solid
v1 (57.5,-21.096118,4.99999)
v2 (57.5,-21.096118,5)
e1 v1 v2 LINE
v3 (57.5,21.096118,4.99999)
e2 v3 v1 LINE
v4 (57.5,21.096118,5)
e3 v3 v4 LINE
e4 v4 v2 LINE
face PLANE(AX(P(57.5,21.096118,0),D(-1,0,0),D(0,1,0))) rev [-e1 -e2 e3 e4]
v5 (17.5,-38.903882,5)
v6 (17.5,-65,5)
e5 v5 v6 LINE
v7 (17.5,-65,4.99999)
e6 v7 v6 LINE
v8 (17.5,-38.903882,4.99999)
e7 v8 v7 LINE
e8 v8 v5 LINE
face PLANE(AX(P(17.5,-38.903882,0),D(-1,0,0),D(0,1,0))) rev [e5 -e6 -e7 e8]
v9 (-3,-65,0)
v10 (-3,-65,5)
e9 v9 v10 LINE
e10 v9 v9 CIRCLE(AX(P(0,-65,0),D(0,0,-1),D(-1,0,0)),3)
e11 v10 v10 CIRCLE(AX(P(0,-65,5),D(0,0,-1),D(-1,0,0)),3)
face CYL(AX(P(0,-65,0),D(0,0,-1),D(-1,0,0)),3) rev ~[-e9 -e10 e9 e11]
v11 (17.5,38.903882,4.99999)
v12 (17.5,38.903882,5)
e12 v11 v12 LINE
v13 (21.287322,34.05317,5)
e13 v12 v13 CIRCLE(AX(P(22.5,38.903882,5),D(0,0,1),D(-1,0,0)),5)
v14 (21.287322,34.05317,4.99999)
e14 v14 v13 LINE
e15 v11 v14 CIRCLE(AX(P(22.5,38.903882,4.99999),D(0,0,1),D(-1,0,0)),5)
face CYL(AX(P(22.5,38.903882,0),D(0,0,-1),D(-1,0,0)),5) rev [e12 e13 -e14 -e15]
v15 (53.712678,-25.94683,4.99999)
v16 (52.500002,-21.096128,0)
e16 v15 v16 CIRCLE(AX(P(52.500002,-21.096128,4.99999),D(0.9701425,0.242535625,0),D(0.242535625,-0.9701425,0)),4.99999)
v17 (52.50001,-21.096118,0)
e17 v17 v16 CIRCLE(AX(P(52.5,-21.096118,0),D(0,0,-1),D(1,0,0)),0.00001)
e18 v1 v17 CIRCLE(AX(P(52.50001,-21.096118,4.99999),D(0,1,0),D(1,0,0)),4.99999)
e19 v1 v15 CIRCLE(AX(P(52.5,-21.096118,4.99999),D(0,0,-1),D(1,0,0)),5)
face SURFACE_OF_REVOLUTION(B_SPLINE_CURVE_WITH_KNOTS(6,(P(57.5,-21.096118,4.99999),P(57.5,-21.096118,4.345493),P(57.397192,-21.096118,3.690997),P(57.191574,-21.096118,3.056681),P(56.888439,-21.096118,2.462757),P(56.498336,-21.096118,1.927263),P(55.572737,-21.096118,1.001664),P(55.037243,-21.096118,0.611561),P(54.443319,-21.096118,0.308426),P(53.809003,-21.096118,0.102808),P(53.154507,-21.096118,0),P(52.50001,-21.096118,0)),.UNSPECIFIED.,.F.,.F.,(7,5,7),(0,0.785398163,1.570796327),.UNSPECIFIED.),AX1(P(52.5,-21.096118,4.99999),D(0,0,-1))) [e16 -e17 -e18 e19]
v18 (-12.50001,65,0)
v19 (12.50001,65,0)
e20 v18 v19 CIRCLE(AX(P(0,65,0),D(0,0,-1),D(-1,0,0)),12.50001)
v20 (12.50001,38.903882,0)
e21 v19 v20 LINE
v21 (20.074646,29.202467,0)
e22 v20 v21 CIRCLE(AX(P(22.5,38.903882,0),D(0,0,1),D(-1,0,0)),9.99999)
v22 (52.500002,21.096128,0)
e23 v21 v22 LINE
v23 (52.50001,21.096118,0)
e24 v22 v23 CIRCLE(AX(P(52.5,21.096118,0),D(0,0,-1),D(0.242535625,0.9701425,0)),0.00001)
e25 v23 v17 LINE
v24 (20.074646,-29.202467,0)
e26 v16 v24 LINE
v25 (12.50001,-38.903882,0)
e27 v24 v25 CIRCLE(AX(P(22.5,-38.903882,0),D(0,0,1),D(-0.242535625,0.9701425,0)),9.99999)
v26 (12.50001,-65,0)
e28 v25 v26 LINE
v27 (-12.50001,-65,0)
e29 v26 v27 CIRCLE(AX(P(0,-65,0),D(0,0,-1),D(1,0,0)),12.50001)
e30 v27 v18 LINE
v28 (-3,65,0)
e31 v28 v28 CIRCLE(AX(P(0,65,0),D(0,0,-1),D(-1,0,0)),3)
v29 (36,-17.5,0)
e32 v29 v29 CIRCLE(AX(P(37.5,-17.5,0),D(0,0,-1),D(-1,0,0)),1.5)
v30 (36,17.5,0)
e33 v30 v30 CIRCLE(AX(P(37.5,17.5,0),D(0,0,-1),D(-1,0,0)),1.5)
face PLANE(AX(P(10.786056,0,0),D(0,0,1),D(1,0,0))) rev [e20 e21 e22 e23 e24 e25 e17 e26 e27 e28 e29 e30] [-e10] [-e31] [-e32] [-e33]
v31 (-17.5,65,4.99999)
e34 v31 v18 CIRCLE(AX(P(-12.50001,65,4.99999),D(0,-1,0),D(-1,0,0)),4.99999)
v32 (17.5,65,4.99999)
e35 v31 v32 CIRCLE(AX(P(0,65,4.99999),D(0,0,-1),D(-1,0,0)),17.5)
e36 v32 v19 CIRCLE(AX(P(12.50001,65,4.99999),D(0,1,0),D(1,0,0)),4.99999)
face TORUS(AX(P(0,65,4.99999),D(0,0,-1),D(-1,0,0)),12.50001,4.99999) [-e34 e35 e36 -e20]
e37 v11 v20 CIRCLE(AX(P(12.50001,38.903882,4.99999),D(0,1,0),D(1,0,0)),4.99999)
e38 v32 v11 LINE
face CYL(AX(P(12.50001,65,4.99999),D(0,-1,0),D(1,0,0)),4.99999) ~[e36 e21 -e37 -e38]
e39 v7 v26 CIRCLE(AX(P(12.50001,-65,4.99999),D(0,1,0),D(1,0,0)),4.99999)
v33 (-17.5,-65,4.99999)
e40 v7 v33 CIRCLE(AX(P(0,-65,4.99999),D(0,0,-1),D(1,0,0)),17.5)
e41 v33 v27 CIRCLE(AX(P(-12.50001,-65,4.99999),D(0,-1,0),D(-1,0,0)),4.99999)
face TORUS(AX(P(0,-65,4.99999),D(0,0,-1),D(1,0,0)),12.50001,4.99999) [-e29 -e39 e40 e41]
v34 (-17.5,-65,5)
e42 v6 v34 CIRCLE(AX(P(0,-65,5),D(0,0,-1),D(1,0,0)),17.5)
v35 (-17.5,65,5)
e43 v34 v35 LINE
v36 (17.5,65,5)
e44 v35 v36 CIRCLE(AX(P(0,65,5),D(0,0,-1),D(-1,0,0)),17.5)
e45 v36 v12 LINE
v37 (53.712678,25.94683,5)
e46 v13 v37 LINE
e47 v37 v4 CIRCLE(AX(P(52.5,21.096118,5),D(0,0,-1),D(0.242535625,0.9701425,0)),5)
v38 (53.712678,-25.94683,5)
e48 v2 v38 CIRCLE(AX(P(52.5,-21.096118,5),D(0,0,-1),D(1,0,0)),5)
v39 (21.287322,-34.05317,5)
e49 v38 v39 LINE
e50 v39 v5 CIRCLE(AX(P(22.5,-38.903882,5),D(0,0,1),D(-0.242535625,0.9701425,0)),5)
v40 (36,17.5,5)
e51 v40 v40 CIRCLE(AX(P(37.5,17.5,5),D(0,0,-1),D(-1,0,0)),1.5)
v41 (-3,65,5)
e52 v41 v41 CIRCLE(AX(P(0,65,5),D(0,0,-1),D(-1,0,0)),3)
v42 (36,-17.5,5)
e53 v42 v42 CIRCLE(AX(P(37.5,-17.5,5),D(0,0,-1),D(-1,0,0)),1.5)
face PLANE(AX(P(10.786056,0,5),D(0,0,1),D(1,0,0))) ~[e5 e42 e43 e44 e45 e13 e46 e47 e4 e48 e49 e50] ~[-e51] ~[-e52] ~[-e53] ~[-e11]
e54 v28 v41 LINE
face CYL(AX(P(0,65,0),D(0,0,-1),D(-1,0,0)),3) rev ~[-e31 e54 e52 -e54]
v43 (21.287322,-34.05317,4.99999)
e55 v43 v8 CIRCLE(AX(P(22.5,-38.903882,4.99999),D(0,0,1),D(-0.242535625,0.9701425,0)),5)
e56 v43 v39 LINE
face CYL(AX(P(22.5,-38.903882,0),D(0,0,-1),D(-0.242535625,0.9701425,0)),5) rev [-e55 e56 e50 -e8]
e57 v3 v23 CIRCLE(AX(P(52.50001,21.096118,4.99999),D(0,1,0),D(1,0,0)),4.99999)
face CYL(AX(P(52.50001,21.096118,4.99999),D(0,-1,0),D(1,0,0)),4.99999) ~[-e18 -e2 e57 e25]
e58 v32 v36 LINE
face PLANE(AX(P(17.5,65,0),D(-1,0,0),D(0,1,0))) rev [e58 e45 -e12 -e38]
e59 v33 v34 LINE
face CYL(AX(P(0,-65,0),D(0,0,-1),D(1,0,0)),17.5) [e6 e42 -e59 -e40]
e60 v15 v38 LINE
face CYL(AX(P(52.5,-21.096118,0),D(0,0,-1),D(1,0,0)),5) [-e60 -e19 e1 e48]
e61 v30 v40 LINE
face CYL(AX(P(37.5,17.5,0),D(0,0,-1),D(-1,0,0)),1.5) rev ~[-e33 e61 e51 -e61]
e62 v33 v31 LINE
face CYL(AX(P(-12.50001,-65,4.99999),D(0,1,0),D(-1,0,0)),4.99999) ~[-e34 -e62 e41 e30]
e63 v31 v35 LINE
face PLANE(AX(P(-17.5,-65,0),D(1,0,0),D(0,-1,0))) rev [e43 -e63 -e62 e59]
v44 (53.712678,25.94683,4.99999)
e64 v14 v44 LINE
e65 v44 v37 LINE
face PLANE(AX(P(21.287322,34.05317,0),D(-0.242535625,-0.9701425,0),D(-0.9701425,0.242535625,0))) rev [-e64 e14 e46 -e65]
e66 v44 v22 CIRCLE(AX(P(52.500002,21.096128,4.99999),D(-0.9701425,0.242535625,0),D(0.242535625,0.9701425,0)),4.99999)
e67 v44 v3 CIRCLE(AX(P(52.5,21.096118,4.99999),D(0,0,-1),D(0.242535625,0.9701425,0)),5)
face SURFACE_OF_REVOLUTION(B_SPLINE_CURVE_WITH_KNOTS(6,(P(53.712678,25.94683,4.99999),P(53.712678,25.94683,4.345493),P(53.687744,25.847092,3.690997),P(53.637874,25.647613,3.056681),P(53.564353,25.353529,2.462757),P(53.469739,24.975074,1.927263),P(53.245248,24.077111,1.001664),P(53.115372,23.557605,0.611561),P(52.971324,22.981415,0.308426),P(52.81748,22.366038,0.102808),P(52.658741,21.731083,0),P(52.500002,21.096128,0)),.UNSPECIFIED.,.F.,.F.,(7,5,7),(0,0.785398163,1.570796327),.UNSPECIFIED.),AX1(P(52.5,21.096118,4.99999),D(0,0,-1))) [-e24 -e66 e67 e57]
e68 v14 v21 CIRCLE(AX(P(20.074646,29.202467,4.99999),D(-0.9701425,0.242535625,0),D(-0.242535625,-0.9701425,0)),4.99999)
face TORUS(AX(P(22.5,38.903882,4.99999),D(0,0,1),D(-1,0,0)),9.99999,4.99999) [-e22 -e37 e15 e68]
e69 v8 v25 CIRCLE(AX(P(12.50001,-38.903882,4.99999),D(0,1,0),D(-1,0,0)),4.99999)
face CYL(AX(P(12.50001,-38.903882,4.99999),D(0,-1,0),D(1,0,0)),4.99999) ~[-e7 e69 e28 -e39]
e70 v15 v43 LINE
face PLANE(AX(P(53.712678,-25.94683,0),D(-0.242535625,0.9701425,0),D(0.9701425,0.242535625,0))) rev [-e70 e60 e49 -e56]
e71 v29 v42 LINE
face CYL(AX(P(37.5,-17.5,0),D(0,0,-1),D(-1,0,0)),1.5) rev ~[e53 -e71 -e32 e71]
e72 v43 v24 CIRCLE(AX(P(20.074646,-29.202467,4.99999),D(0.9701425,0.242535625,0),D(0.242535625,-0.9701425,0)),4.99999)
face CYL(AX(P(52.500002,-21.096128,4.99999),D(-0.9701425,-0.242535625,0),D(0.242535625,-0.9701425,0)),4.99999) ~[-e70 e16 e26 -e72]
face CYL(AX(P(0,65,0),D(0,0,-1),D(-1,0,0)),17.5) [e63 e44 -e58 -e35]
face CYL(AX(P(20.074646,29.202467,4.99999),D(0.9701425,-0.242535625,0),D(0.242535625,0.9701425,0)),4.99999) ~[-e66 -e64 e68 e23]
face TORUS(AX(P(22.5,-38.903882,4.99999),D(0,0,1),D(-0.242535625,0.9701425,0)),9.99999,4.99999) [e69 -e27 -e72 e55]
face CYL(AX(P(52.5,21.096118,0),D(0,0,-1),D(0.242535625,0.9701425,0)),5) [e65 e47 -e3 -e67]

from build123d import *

# Parameters (mm, degrees)
F0_R     = 1.5
F0_R_2   = 3
F1_DEPTH = 5
F2_R     = 4.99999


# Not quite as in the source:
# - a fillet or chamfer is up to 0.001 mm smaller than in the source, because OpenCascade refuses the exact size


with BuildPart() as f1:
    # F0 (on Top) → F1 (new body)
    with BuildSketch(Plane.XY):
        with BuildLine():
            Line((17.5, -65), (17.5, 65))
            ThreePointArc((17.5, 65), (0, 82.5), (-17.5, 65))
            Line((-17.5, 65), (-17.5, 38.903882032))
            ThreePointArc((-17.5, 38.903882032), (-18.5589728099, 35.826820985), (-21.2873218748, 34.0531695313))
            Line((-21.2873218748, 34.0531695313), (-53.7126781252, 25.9468304687))
            ThreePointArc((-53.7126781252, 25.9468304687), (-56.4410271901, 24.173179015), (-57.5, 21.096117968))
            Line((-57.5, 21.096117968), (-57.5, -21.096117968))
            ThreePointArc((-57.5, -21.096117968), (-56.4410271901, -24.173179015), (-53.7126781252, -25.9468304687))
            Line((-53.7126781252, -25.9468304687), (-21.2873218748, -34.0531695313))
            ThreePointArc((-21.2873218748, -34.0531695313), (-18.5589728099, -35.826820985), (-17.5, -38.903882032))
            Line((-17.5, -38.903882032), (-17.5, -65))
            ThreePointArc((-17.5, -65), (0, -82.5), (17.5, -65))
        make_face()
        with Locations((-37.5, -17.5)):
            Circle(F0_R, mode=Mode.SUBTRACT)
        with Locations((0, -65)):
            Circle(F0_R_2, mode=Mode.SUBTRACT)
        with Locations((-37.5, 17.5)):
            Circle(F0_R, mode=Mode.SUBTRACT)
        with Locations((0, 65)):
            Circle(F0_R_2, mode=Mode.SUBTRACT)
    extrude(amount=F1_DEPTH)

    # F2 (radius 5 in the source; OpenCascade refuses exactly that, so slightly less here)
    f2_edges = [f1.edges().sort_by_distance(p)[0] for p in [
        (17.5, 0, 0),
    ]]
    fillet(f2_edges, radius=F2_R)


with BuildPart() as f3_1:
    # F3: instance of F1
    add(f1.part.mirror(Plane.YZ))


solid = f3_1.part
